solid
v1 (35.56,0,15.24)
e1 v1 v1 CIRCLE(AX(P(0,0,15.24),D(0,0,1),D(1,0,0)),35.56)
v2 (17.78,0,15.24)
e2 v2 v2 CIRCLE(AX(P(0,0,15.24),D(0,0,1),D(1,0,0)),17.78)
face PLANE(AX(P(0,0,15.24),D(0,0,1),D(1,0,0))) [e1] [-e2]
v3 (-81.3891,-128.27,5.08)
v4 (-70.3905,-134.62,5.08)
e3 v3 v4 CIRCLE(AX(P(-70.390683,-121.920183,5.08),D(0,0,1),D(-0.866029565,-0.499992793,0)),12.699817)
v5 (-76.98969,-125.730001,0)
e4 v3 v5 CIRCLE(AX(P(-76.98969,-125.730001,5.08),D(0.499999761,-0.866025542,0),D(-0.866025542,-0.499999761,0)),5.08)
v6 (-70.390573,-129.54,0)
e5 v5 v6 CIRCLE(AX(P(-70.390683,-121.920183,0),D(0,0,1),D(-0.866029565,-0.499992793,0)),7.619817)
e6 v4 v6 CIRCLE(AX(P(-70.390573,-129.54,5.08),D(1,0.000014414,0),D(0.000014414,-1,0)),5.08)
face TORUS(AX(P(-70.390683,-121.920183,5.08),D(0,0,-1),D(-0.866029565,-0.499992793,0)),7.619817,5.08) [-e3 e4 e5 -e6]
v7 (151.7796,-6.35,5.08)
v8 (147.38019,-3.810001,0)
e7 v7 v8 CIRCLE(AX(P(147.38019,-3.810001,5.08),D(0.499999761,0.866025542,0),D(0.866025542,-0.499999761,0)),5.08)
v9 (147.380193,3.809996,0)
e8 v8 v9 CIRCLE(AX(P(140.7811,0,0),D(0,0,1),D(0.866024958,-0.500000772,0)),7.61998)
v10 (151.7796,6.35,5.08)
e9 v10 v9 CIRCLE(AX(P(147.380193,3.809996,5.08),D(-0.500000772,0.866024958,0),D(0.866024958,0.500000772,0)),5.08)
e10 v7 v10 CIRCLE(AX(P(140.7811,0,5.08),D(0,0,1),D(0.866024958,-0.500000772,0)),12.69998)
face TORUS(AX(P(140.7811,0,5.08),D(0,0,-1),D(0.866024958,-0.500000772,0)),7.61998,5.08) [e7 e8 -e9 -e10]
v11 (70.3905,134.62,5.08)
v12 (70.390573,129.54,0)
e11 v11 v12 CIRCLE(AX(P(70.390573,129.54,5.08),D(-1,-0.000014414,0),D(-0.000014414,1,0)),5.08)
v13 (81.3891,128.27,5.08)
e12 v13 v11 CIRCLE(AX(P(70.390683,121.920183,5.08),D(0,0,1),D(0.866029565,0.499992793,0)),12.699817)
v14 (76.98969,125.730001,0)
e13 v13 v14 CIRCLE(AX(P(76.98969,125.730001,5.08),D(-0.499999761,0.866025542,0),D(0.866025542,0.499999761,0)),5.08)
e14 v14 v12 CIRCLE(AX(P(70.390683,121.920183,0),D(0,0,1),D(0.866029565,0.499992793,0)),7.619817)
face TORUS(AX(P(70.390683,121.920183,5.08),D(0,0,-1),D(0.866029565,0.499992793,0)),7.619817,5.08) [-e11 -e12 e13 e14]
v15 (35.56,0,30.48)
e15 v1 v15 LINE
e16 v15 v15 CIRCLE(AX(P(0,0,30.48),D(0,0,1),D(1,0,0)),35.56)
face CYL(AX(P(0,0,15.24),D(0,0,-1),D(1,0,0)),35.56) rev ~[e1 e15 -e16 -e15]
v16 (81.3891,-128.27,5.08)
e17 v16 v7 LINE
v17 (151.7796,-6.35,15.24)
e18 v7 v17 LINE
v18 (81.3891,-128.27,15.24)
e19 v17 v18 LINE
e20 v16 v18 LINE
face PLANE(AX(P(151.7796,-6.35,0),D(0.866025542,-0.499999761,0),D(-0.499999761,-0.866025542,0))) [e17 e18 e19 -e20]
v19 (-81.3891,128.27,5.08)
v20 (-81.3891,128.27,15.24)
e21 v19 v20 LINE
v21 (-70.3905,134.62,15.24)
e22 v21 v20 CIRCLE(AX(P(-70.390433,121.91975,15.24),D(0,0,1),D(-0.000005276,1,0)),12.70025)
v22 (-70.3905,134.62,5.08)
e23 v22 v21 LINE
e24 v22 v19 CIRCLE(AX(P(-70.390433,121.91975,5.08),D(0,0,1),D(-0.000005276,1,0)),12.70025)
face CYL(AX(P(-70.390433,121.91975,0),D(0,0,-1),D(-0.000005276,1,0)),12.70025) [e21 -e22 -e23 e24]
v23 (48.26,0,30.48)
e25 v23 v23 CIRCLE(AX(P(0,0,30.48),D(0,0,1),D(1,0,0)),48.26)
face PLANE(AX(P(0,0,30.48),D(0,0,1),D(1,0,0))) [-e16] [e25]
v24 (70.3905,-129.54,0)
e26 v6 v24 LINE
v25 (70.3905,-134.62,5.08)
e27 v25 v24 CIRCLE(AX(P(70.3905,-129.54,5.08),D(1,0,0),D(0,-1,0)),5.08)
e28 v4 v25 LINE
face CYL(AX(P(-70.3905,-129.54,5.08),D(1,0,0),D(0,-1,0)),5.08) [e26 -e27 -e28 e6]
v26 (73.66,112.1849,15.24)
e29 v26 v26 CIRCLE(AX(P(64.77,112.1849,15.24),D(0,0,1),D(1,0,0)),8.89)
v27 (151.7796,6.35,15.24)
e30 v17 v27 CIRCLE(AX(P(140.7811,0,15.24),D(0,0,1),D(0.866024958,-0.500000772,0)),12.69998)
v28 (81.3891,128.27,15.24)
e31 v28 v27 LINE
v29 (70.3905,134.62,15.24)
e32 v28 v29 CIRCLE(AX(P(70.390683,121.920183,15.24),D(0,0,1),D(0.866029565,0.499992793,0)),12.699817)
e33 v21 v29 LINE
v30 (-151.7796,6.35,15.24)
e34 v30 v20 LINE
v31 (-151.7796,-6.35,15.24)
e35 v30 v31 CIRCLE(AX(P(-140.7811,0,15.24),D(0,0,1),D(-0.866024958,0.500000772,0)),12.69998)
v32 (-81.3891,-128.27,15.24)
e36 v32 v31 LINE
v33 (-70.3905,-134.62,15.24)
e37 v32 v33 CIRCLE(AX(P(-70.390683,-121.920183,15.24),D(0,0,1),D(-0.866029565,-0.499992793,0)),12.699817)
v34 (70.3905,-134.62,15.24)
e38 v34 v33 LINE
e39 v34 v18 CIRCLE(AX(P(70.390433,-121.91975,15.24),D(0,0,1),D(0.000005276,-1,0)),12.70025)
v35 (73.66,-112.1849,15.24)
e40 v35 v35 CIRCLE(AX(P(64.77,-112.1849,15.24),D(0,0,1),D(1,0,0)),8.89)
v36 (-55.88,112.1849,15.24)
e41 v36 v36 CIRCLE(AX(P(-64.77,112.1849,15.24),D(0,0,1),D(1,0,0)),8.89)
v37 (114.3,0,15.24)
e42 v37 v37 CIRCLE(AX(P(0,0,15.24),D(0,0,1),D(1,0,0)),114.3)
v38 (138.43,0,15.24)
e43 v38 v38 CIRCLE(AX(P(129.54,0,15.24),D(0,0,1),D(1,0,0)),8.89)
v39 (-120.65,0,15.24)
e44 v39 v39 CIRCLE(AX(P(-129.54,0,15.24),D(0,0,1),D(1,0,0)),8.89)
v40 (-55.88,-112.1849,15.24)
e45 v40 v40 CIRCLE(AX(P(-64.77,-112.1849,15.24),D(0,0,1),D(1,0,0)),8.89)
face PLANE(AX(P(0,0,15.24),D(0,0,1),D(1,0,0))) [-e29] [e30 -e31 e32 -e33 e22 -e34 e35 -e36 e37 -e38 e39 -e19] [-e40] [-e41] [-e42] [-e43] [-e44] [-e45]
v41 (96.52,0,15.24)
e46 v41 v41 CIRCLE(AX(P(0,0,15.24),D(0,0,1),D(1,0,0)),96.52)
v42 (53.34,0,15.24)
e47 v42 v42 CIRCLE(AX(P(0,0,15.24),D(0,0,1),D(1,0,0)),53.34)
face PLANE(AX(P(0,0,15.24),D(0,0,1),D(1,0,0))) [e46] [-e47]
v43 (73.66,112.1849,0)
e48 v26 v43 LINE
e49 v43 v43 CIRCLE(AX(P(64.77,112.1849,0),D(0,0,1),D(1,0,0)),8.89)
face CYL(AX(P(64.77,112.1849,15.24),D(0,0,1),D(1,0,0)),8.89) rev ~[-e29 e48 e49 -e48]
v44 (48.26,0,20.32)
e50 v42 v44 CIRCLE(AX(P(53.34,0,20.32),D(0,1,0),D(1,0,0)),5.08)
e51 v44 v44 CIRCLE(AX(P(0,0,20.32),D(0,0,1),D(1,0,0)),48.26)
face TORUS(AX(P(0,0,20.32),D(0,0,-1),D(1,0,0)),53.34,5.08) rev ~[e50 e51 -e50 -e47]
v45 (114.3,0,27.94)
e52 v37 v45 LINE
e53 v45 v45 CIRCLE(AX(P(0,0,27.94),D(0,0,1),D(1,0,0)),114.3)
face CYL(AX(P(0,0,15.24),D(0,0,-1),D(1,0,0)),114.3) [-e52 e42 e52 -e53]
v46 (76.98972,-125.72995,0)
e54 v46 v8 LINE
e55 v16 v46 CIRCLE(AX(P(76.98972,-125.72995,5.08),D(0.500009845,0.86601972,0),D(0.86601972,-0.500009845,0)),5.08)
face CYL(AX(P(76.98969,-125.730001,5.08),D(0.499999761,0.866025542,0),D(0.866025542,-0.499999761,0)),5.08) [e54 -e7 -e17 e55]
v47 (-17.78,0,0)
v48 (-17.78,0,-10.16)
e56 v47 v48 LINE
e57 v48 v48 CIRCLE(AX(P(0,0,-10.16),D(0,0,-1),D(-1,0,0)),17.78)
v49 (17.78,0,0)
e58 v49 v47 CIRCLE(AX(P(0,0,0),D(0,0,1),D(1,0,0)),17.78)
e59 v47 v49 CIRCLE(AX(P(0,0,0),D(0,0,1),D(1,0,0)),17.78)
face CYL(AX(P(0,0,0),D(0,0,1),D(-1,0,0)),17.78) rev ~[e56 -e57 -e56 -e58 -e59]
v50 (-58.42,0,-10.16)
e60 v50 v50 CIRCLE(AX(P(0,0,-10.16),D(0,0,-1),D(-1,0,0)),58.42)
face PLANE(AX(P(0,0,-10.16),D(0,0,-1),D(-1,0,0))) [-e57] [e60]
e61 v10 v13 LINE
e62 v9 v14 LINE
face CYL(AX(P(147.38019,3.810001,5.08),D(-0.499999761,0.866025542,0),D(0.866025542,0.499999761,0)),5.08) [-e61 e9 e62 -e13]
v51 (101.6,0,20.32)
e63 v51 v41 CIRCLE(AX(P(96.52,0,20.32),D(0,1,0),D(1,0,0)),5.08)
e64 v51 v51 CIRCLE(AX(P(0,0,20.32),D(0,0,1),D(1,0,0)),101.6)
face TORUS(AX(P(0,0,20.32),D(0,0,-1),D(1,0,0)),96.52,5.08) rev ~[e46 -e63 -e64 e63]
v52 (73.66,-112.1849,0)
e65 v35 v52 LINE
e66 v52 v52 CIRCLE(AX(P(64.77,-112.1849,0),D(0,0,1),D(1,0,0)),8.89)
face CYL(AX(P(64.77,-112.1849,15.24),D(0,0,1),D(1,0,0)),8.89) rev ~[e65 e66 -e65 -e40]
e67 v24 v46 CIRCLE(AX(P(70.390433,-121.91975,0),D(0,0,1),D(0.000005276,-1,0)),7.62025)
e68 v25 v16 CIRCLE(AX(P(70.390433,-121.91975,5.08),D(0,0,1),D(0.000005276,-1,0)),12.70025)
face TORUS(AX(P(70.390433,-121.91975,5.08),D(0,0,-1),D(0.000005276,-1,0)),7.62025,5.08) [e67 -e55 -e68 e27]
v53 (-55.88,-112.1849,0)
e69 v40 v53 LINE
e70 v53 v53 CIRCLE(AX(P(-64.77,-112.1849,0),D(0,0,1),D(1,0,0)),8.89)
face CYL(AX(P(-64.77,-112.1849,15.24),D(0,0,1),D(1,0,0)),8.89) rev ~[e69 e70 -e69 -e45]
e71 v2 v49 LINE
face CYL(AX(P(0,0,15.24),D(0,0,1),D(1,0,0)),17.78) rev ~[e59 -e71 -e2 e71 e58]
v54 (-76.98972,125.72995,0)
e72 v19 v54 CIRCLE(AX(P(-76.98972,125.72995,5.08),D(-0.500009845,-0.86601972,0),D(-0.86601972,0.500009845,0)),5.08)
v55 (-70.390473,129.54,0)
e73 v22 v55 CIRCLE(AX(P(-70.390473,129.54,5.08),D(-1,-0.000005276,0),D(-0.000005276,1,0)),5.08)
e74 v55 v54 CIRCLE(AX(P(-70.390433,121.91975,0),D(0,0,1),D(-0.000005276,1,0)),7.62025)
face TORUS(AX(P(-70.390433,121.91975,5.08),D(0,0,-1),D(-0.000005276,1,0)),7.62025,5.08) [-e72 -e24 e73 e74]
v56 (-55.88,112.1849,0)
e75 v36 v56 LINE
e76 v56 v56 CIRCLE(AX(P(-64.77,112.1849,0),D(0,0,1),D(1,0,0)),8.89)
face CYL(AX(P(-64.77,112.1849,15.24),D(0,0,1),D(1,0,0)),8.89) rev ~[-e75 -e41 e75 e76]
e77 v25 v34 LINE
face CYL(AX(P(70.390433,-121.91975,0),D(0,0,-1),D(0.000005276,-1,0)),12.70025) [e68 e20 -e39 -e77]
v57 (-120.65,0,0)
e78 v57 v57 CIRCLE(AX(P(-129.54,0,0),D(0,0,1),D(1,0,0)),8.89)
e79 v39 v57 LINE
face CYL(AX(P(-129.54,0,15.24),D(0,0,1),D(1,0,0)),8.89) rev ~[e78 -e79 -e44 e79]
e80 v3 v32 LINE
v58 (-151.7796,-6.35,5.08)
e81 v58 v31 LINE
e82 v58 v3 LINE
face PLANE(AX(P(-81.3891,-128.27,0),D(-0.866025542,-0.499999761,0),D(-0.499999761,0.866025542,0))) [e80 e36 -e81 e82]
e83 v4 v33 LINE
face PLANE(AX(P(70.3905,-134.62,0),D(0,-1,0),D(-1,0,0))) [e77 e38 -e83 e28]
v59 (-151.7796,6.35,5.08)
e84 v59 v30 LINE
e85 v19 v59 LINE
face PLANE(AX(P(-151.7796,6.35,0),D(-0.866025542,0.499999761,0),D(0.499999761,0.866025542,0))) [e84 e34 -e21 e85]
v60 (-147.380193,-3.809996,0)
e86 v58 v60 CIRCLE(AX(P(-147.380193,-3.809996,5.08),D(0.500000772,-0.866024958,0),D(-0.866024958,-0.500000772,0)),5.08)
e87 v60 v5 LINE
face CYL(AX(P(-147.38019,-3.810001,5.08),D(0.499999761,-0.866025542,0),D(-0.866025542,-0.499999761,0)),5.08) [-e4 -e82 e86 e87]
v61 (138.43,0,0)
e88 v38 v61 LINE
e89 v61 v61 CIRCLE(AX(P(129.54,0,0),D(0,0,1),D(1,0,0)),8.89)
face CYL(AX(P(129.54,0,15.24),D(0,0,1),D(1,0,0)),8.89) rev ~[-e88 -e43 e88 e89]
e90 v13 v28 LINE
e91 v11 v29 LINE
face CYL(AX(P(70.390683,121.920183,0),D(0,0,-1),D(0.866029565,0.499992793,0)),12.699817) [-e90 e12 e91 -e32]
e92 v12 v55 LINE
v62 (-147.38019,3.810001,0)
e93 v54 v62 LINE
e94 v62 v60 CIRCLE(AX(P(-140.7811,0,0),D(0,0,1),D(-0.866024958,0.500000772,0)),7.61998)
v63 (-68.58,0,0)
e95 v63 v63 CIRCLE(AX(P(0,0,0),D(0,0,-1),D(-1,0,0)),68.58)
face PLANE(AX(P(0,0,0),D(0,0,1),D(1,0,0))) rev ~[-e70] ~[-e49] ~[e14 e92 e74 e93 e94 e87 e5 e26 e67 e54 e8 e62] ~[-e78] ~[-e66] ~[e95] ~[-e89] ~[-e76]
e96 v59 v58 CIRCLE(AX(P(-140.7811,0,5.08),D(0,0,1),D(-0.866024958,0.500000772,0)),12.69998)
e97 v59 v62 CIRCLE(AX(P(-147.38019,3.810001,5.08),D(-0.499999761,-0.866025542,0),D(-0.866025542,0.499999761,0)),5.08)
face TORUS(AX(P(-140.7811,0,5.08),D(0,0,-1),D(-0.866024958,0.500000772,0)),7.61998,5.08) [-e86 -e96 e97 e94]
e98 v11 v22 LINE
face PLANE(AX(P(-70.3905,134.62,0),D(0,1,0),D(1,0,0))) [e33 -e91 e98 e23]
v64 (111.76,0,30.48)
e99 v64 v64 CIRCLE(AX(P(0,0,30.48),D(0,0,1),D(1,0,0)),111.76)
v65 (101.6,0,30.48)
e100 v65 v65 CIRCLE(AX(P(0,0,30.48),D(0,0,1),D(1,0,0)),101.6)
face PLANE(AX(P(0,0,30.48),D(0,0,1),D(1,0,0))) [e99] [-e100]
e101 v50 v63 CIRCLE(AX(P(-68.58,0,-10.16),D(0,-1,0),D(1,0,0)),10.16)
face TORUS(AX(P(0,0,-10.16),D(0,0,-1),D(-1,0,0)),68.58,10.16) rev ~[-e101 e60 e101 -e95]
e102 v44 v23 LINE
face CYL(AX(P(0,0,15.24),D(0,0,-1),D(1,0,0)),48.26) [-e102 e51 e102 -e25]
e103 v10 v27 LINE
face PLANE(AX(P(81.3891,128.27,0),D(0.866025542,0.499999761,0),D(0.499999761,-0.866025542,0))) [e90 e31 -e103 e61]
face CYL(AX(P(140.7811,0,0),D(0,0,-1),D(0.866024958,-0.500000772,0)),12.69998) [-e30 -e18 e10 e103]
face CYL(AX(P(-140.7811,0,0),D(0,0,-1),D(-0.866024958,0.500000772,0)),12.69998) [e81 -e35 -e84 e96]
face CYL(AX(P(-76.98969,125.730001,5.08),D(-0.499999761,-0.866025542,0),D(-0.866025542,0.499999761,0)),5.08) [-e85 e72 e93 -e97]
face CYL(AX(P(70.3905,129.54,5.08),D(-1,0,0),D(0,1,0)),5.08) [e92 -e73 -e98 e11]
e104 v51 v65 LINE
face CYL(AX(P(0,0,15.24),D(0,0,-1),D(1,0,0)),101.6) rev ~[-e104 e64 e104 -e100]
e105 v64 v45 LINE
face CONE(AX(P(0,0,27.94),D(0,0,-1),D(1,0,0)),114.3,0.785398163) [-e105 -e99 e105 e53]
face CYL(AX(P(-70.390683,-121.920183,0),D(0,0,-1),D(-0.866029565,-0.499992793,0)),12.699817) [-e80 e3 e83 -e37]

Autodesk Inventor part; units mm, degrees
ref_plane "YZ Plane" through (0, 0, 0) normal (1, 0, 0) x (0, 1, 0)
ref_plane "XZ Plane" through (0, 0, 0) normal (0, 1, 0) x (-1, 0, 0)
ref_plane "XY Plane" through (0, 0, 0) normal (0, 0, 1) x (1, 0, 0)
sketch "Sketch1" plane through (0, 0, 0) normal (0, 0, 1) x (1, 0, 0)
  line L0 (70.3905, -134.62) -> (-70.3905, -134.62)
  line L1 (-81.3891, -128.27) -> (-151.7796, -6.35)
  line L2 (-151.7796, 6.35) -> (-81.3891, 128.27)
  line L3 (-70.3905, 134.62) -> (70.3905, 134.62)
  line L4 (81.3891, 128.27) -> (151.7796, 6.35)
  line L5 (151.7796, -6.35) -> (81.3891, -128.27)
  arc A0 (-70.3905, 134.62) -> (-81.3891, 128.27) centre (-70.3905, 121.92) ccw
  arc A1 (-151.7796, 6.35) -> (-151.7796, -6.35) centre (-140.7811, 0) ccw
  arc A2 (-81.3891, -128.27) -> (-70.3905, -134.62) centre (-70.3905, -121.92) ccw
  arc A3 (70.3905, -134.62) -> (81.3891, -128.27) centre (70.3905, -121.92) ccw
  arc A4 (151.7796, -6.35) -> (151.7796, 6.35) centre (140.7811, 0) ccw
  arc A5 (81.3891, 128.27) -> (70.3905, 134.62) centre (70.3905, 121.92) ccw
  point P0 (0, 0)
  point P1 (0, 0)
  point P2 (77.7229, -134.62)
  point P3 (-77.7229, -134.62)
  point P4 (-155.4458, 0)
  point P5 (-77.7229, 134.62)
  point P6 (77.7229, 134.62)
  point P7 (155.4458, 0)
  dimension "d0" = 269.24
  dimension "d1" = 12.7
extrude "Extrusion1" add sketch "Sketch1" along normal blind 15.24
sketch "Sketch2" plane through (0, 0, 15.24) normal (0, 0, 1) x (1, 0, 0)
  circle A0 centre (0, 0) radius 17.78
  circle A1 centre (0, 0) radius 58.42
  dimension "d5" = 35.56
  dimension "d8" = 116.84
extrude "Extrusion2" cut sketch "Sketch2" against normal through all contours A0
sketch "Sketch3" plane through (0, 0, 0) normal (0, 0, -1) x (-1, 0, 0)
  circle A0 centre (0, 0) radius 17.78 projected
  circle A1 centre (0, 0) radius 58.42
  dimension "d9" = 116.84
extrude "Extrusion3" add sketch "Sketch3" along normal blind 10.16
fillet "Fillet1" radius 10.16 1 edges at (58.42, 0, 0)
fillet "Fillet2" radius 5.08 12 edges at (-76.7405, 132.9185, 0) (-116.5843, 67.31, 0) (-153.4811, 0, 0) (-116.5843, -67.31, 0) (-76.7405, -132.9185, 0) (0, -134.62, 0) (76.7405, -132.9185, 0) (116.5843, -67.31, 0) (153.4811, 0, 0) (116.5843, 67.31, 0) (76.7405, 132.9185, 0) (0, 134.62, 0)
sketch "Sketch4" plane through (0, 0, 15.24) normal (0, 0, 1) x (1, 0, 0)
  circle A0 centre (0, 0) radius 129.54 construction
  circle A1 centre (0, 0) radius 35.56
  circle A2 centre (0, 0) radius 48.26
  circle A3 centre (0, 0) radius 17.78 projected
  circle A4 centre (0, 0) radius 101.6
  circle A5 centre (0, 0) radius 114.3
  circle A6 centre (-129.54, 0) radius 8.89
  circle A7 centre (-64.77, -112.1849) radius 8.89
  circle A8 centre (64.77, -112.1849) radius 8.89
  circle A9 centre (129.54, 0) radius 8.89
  circle A10 centre (64.77, 112.1849) radius 8.89
  circle A11 centre (-64.77, 112.1849) radius 8.89
  dimension "d14" = 259.08
  dimension "d15" = 71.12
  dimension "d16" = 96.52
  dimension "d17" = 203.2
  dimension "d18" = 228.6
  dimension "d19" = 17.78
  dimension "d22" = 360
extrude "Extrusion4" add sketch "Sketch4" along normal blind 15.24 contours A2 | A5
extrude "Extrusion5" cut sketch "Sketch4" against normal through all contours A6 | A7 | A8 | A9 | A10 | A11
fillet "Fillet3" radius 5.08 2 edges at (-101.6, 0, 15.24) (-48.26, 0, 15.24)
chamfer "Chamfer1" distance 2.54 angle 45 1 edges at (-114.3, 0, 30.48)
equation "\"BendRadius\" = Thickness"
equation "\"BendReliefWidth\" = Thickness"
equation "\"BendReliefDepth\" = 0.5 * Thickness"
equation "\"CornerReliefSize\" = 4 * Thickness"
equation "\"MinimumRemnant\" = 2 * Thickness"
equation "\"TransitionRadius\" = BendRadius"
equation "\"JacobiRadiusSize\" = BendRadius"
equation "\"GapSize\" = Thickness"
equation "\"Thickness\" = 3.048"
properties part number "crank case cover" material "Aluminum 6061"
